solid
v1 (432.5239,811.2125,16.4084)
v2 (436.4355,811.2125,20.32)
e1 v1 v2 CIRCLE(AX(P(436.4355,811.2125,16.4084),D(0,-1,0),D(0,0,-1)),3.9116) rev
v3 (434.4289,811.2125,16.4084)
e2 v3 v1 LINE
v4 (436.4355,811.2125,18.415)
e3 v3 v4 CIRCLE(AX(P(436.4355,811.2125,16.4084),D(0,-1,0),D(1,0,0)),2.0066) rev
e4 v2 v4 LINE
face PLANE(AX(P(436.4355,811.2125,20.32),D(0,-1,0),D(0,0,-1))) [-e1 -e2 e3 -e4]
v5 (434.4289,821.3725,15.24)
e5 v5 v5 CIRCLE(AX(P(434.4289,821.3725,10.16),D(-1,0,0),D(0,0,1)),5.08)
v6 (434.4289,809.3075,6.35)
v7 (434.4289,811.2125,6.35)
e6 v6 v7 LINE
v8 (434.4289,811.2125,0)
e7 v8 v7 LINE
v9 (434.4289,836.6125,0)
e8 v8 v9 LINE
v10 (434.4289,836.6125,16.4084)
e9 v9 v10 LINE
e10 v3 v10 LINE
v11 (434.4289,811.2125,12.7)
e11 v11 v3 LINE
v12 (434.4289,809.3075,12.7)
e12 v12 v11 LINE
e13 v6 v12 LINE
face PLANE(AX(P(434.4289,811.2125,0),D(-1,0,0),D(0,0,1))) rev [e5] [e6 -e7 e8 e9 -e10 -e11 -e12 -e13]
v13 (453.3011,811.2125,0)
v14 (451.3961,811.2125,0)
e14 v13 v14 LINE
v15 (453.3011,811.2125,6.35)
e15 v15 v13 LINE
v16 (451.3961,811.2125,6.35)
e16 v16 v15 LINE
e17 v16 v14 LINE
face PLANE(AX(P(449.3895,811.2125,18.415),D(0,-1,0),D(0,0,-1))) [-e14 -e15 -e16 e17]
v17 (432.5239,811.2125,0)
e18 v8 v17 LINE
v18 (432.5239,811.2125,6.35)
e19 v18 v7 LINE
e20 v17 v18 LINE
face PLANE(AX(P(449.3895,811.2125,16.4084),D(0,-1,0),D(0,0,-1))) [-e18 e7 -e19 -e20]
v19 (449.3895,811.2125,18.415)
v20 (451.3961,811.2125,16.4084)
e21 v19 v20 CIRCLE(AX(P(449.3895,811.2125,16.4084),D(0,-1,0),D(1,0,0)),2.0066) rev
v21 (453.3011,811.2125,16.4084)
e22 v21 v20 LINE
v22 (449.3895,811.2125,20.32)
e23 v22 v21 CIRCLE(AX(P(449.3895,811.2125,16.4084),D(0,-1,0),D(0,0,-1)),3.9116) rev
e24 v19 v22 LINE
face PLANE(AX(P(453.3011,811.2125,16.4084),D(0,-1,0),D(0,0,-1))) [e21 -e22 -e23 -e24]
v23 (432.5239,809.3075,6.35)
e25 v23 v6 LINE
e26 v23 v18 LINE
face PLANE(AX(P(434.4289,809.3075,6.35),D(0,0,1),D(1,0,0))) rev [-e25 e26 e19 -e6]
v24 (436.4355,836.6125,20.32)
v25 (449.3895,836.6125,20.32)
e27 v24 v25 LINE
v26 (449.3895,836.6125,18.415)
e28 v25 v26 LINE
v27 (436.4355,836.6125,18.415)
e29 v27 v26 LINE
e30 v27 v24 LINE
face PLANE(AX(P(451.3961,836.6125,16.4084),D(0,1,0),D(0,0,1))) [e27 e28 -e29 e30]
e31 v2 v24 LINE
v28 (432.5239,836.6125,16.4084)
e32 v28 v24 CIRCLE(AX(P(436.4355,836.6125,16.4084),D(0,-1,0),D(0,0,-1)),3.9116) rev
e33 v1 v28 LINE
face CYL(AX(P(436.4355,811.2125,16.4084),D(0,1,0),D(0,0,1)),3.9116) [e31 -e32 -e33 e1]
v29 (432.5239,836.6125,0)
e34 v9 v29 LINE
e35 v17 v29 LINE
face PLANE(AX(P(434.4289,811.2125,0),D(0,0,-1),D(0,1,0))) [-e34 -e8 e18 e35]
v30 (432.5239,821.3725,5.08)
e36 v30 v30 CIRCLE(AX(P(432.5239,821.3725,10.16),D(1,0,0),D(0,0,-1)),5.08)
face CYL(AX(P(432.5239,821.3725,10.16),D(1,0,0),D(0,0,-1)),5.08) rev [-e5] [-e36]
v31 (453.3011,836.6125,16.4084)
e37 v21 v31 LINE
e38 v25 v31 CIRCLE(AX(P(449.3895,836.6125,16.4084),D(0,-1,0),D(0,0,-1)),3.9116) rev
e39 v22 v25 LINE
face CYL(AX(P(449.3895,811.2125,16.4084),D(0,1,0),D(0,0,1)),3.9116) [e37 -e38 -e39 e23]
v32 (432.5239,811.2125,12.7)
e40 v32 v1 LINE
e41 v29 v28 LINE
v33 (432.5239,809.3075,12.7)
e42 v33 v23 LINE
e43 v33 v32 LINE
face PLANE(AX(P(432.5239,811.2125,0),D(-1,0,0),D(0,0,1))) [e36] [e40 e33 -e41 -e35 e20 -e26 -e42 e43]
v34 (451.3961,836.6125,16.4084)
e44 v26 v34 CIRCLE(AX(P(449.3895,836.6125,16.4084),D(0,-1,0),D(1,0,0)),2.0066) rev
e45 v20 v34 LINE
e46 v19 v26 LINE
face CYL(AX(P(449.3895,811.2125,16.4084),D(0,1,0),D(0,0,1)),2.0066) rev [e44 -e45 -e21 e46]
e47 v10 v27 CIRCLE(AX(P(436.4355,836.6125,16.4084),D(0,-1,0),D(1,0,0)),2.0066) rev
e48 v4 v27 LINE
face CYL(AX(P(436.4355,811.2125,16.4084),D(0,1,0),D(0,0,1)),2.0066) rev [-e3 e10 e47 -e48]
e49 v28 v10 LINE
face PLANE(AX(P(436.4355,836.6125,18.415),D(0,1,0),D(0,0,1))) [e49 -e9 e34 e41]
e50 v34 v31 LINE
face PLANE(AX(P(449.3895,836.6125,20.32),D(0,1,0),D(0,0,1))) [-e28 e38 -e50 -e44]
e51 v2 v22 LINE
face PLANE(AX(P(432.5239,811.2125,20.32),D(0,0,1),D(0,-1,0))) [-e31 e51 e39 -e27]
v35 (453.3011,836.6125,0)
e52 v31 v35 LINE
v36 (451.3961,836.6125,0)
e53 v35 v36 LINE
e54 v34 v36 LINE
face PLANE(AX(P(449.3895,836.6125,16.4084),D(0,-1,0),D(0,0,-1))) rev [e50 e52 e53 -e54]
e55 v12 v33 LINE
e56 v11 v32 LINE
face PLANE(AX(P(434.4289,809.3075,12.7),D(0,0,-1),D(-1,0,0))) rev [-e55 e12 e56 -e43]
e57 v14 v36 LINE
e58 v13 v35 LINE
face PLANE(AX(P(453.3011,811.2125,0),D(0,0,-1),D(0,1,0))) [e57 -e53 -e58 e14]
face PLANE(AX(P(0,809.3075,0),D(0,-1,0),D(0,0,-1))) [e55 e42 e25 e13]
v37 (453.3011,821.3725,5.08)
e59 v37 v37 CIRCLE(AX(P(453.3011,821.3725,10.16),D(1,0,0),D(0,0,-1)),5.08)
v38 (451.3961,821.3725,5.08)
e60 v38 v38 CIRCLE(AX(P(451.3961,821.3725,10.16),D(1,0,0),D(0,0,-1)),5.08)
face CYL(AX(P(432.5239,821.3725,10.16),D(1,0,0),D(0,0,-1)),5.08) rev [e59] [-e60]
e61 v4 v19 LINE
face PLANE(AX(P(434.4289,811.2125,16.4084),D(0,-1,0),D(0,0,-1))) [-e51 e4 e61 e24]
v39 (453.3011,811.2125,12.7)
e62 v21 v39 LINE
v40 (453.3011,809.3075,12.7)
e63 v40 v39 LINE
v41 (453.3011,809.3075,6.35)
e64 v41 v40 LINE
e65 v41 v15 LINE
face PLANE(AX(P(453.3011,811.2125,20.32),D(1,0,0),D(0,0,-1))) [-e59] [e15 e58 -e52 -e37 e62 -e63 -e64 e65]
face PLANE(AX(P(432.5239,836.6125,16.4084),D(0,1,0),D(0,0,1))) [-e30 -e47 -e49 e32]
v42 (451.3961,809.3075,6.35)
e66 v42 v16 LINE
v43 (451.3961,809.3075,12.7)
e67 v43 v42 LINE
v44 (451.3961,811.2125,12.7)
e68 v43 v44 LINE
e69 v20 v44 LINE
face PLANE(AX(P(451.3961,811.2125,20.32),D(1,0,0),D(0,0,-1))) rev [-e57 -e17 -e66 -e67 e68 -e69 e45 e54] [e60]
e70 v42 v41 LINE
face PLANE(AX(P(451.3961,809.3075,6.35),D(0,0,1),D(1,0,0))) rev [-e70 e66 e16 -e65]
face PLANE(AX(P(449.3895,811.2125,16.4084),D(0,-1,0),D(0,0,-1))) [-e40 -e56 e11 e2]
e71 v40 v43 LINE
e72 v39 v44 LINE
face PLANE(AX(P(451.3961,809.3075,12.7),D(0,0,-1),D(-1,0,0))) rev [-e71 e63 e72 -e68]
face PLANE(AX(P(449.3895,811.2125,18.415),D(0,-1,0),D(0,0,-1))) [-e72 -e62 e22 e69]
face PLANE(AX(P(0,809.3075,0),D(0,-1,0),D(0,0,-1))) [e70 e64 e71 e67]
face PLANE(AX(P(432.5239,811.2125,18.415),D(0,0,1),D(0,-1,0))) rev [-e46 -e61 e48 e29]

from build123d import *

# Parameters (mm, degrees)
BASE_FLANGE1_DEPTH      = 25.4
SKETCH6_R               = 5.08
CUT_EXTRUDE1_DEPTH      = 838.117118208
BOSS_EXTRUDE1_OUTLINE_W = 1.905
BOSS_EXTRUDE1_OUTLINE_H = 6.35
BOSS_EXTRUDE1_DEPTH     = 1.905


# Read off the part's stored shape, not the designer's step: Boss-Extrude1
# Sheet-metal steps are written as plain solids
with BuildPart() as part:
    # Sketch1 → Base-Flange1 (new body)
    with BuildSketch(Plane(origin=(0, 836.6125, -836.6125), x_dir=(1, 0, 0), z_dir=(0, -1, 0))):
        with BuildLine():
            Line((432.5239, 836.6125), (432.5239, 853.0209))
            ThreePointArc((432.5239, 853.0209), (433.669581115, 855.786818885), (436.4355, 856.9325))
            Line((436.4355, 856.9325), (449.3895, 856.9325))
            ThreePointArc((449.3895, 856.9325), (452.155418885, 855.786818885), (453.3011, 853.0209))
            Line((453.3011, 853.0209), (453.3011, 836.6125))
            Line((453.3011, 836.6125), (451.3961, 836.6125))
            Line((451.3961, 836.6125), (451.3961, 853.0209))
            ThreePointArc((451.3961, 853.0209), (450.808380467, 854.439780467), (449.3895, 855.0275))
            Line((449.3895, 855.0275), (436.4355, 855.0275))
            ThreePointArc((436.4355, 855.0275), (435.016619533, 854.439780467), (434.4289, 853.0209))
            Line((434.4289, 853.0209), (434.4289, 836.6125))
            Line((434.4289, 836.6125), (432.5239, 836.6125))
        make_face()
    extrude(amount=BASE_FLANGE1_DEPTH)

    # Sketch6 → Cut-Extrude1 (cut, through all)
    with BuildSketch(Plane(origin=(453.3011, 0, 0), x_dir=(0, 0, -1), z_dir=(1, 0, 0))):
        with Locations((-10.16, 821.3725)):
            Circle(SKETCH6_R)
    extrude(amount=-CUT_EXTRUDE1_DEPTH, mode=Mode.SUBTRACT)

    # Boss-Extrude1 outline → Boss-Extrude1 (add)
    with BuildSketch(Plane.XZ.offset(-811.2125)):
        with Locations((452.3486, 9.525)):
            Rectangle(BOSS_EXTRUDE1_OUTLINE_W, BOSS_EXTRUDE1_OUTLINE_H)
        with Locations((433.4764, 9.525)):
            Rectangle(BOSS_EXTRUDE1_OUTLINE_W, BOSS_EXTRUDE1_OUTLINE_H)
    extrude(amount=BOSS_EXTRUDE1_DEPTH)


solid = part.part
